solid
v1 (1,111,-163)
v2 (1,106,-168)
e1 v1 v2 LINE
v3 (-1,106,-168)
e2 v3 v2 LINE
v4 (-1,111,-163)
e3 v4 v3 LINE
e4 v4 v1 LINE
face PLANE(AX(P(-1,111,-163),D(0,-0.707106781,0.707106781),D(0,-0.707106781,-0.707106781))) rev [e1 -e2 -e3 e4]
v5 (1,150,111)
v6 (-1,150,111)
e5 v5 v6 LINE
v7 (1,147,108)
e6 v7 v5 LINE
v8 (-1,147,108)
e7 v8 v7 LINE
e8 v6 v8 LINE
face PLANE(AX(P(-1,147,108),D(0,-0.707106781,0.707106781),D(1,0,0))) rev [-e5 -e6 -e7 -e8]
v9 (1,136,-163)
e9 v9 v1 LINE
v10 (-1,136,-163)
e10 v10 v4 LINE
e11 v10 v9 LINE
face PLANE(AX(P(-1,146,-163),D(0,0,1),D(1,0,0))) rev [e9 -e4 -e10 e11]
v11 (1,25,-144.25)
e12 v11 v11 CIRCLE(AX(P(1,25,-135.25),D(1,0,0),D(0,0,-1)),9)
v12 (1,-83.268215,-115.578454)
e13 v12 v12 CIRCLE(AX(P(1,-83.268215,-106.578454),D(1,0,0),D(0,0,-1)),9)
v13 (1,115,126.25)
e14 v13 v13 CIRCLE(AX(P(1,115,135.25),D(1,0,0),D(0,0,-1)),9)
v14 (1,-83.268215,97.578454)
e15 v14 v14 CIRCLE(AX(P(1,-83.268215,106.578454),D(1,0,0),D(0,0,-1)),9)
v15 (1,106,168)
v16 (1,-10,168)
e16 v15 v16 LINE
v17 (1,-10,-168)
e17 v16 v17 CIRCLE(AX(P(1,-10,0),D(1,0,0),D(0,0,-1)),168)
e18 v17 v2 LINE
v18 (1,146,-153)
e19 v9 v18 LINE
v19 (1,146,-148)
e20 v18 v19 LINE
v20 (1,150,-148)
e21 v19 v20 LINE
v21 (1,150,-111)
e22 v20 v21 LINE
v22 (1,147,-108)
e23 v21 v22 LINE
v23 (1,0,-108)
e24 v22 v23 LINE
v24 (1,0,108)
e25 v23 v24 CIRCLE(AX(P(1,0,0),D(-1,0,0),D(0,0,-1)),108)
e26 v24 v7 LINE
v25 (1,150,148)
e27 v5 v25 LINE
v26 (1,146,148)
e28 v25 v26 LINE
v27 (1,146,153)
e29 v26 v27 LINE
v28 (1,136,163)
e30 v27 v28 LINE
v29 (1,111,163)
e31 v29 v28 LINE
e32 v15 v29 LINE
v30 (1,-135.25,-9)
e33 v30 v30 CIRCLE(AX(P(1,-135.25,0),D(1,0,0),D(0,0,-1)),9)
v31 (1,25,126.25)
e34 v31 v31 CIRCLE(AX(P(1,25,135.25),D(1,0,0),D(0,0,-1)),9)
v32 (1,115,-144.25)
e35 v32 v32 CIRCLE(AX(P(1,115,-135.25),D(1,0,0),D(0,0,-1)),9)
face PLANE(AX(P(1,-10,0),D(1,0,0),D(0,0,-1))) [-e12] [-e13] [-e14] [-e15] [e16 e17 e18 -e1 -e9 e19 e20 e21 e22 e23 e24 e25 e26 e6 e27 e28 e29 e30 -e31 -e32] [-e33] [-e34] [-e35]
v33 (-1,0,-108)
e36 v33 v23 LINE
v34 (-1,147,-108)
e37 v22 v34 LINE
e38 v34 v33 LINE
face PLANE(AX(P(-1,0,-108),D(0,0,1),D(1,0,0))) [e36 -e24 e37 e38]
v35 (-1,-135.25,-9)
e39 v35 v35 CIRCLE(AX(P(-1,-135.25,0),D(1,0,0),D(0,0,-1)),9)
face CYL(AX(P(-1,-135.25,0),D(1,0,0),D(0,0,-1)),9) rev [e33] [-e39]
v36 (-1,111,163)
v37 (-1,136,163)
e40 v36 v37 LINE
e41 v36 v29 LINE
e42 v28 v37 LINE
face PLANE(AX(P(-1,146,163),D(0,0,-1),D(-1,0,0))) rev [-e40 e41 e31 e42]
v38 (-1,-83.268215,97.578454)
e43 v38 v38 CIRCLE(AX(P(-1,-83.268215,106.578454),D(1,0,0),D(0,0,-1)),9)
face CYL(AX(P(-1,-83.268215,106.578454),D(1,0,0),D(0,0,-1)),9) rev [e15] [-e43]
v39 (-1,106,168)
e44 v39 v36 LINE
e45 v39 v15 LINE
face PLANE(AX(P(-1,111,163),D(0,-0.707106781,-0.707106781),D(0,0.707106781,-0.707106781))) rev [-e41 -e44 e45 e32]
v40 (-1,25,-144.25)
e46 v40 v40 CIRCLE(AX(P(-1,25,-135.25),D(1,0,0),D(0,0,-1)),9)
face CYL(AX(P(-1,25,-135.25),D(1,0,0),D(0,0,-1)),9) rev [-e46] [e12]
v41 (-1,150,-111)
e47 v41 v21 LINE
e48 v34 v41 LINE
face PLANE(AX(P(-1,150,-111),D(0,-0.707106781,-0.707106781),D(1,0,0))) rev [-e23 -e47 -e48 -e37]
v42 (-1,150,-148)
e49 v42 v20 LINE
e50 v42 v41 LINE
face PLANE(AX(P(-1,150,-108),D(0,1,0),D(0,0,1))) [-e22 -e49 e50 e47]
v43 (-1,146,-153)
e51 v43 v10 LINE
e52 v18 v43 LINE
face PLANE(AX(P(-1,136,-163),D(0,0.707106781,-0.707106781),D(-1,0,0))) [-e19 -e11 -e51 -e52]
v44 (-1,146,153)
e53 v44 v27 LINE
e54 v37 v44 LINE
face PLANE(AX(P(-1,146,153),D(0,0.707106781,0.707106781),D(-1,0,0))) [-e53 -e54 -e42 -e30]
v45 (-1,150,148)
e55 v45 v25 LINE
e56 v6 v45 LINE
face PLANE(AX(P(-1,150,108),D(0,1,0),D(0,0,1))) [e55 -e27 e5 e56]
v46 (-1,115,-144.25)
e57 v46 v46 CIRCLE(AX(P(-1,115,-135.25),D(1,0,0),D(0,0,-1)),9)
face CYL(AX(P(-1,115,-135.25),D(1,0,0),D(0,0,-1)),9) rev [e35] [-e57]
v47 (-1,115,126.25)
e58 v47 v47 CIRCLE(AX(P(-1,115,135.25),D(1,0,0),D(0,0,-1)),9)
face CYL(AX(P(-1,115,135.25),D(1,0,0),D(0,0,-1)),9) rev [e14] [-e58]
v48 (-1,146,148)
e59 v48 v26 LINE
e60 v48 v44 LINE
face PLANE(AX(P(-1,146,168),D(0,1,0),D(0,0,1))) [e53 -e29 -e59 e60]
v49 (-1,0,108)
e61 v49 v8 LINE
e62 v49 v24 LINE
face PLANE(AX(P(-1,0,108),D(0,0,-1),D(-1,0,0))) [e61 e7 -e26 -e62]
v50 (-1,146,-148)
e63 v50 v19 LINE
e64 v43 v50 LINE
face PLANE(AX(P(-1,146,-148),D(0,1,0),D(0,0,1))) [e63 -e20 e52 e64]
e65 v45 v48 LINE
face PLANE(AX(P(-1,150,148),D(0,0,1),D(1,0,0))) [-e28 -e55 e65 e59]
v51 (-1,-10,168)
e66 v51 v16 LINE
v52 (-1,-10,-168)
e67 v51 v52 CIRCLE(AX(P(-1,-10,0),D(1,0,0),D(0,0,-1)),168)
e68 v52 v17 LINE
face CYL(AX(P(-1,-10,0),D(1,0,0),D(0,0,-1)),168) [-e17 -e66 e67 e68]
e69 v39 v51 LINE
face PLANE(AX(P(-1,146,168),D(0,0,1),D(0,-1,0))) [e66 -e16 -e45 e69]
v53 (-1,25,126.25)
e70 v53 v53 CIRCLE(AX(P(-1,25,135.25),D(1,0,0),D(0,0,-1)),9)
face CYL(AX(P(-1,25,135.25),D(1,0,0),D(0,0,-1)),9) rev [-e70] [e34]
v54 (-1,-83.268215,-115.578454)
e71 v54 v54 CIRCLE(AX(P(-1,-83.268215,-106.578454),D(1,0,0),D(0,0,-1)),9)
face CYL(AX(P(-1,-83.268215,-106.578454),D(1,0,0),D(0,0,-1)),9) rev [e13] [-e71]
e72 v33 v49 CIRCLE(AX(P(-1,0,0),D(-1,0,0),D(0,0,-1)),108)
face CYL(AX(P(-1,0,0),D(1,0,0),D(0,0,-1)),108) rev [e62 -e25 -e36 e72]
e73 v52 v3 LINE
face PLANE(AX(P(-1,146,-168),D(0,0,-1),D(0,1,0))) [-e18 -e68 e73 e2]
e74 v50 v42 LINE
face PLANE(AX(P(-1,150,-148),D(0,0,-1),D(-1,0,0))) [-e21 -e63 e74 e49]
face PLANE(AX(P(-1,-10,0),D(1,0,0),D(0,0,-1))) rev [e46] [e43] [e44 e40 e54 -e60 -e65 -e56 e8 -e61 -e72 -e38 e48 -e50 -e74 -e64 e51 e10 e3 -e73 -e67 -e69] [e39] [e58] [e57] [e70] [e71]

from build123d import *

# Parameters (mm, degrees)
SM_START                 = -1
SM_BASE_FLANGE_1_DEPTH   = 2
SKETCH_6_R               = 9
SKETCH_6_R_2             = 68.5
CUT_EXTRUDE_1_DEPTH      = 245.769279118
CUT_EXTRUDE_2_DEPTH      = 245.763150821
CUT_EXTRUDE_2_DEPTH_BACK = 245.763150821
CHAMFER_3_SIZE           = 10
CHAMFER_4_SIZE           = 3


# Read off the part's stored shape, not the designer's step: Базовая кромка1
with BuildPart() as part:
    # Базовая кромка1 outline → Базовая кромка1 (new body)
    with BuildSketch(Plane(origin=(0, 0, 0), x_dir=(0, 0, -1), z_dir=(1, 0, 0)).offset(SM_START)):
        with BuildLine():
            ThreePointArc((108, 0), (0, -108), (-108, 0))
            Line((-108, 0), (-108, 150))
            Line((-108, 150), (-148, 150))
            Line((-148, 150), (-148, 146))
            Line((-148, 146), (-168, 146))
            Line((-168, 146), (-168, -10))
            ThreePointArc((-168, -10), (0, -178), (168, -10))
            Line((168, -10), (168, 146))
            Line((168, 146), (148, 146))
            Line((148, 146), (148, 150))
            Line((148, 150), (108, 150))
            Line((108, 150), (108, 0))
        make_face()
    extrude(amount=SM_BASE_FLANGE_1_DEPTH)

    # Эскиз6 → Вырез-Вытянуть1 (cut, through all)
    with BuildSketch(Plane(origin=(1, 0, 0), x_dir=(0, 0, -1), z_dir=(1, 0, 0))):
        with Locations((-135.25, 115)):
            Circle(SKETCH_6_R)
        with Locations((-106.578454425, -83.268214538)):
            Circle(SKETCH_6_R)
        with Locations((0, -135.25)):
            Circle(SKETCH_6_R)
        with Locations((106.578454425, -83.268214538)):
            Circle(SKETCH_6_R)
        with Locations((135.25, 115)):
            Circle(SKETCH_6_R)
        Circle(SKETCH_6_R_2)
        with Locations((-135.25, 25)):
            Circle(SKETCH_6_R)
        with Locations((135.25, 25)):
            Circle(SKETCH_6_R)
    extrude(amount=-CUT_EXTRUDE_1_DEPTH, mode=Mode.SUBTRACT)

    # Эскиз7 → Вырез-Вытянуть2 (cut, two sides: drawn at the far end of the back side and taken through both)
    with BuildSketch(Plane(origin=(0, 0, 0), x_dir=(0, 0, -1), z_dir=(1, 0, 0)).offset(-CUT_EXTRUDE_2_DEPTH_BACK)):
        Polygon((-163, 111), (-168, 106), (-168, 111), (-168, 146), (-163, 146), align=None)
        Polygon((168, 146), (163, 146), (163, 111), (168, 106), (168, 111), align=None)
    extrude(amount=CUT_EXTRUDE_2_DEPTH + CUT_EXTRUDE_2_DEPTH_BACK, mode=Mode.SUBTRACT)

    # Фаска3
    chamfer_3_edges = [part.edges().sort_by_distance(p)[0] for p in [
        (0, 146, 163),
        (0, 146, -163),
    ]]
    chamfer(chamfer_3_edges, length=CHAMFER_3_SIZE)

    # Фаска4
    chamfer_4_edges = [part.edges().sort_by_distance(p)[0] for p in [
        (0, 150, -108),
        (0, 150, 108),
    ]]
    chamfer(chamfer_4_edges, length=CHAMFER_4_SIZE)


solid = part.part
